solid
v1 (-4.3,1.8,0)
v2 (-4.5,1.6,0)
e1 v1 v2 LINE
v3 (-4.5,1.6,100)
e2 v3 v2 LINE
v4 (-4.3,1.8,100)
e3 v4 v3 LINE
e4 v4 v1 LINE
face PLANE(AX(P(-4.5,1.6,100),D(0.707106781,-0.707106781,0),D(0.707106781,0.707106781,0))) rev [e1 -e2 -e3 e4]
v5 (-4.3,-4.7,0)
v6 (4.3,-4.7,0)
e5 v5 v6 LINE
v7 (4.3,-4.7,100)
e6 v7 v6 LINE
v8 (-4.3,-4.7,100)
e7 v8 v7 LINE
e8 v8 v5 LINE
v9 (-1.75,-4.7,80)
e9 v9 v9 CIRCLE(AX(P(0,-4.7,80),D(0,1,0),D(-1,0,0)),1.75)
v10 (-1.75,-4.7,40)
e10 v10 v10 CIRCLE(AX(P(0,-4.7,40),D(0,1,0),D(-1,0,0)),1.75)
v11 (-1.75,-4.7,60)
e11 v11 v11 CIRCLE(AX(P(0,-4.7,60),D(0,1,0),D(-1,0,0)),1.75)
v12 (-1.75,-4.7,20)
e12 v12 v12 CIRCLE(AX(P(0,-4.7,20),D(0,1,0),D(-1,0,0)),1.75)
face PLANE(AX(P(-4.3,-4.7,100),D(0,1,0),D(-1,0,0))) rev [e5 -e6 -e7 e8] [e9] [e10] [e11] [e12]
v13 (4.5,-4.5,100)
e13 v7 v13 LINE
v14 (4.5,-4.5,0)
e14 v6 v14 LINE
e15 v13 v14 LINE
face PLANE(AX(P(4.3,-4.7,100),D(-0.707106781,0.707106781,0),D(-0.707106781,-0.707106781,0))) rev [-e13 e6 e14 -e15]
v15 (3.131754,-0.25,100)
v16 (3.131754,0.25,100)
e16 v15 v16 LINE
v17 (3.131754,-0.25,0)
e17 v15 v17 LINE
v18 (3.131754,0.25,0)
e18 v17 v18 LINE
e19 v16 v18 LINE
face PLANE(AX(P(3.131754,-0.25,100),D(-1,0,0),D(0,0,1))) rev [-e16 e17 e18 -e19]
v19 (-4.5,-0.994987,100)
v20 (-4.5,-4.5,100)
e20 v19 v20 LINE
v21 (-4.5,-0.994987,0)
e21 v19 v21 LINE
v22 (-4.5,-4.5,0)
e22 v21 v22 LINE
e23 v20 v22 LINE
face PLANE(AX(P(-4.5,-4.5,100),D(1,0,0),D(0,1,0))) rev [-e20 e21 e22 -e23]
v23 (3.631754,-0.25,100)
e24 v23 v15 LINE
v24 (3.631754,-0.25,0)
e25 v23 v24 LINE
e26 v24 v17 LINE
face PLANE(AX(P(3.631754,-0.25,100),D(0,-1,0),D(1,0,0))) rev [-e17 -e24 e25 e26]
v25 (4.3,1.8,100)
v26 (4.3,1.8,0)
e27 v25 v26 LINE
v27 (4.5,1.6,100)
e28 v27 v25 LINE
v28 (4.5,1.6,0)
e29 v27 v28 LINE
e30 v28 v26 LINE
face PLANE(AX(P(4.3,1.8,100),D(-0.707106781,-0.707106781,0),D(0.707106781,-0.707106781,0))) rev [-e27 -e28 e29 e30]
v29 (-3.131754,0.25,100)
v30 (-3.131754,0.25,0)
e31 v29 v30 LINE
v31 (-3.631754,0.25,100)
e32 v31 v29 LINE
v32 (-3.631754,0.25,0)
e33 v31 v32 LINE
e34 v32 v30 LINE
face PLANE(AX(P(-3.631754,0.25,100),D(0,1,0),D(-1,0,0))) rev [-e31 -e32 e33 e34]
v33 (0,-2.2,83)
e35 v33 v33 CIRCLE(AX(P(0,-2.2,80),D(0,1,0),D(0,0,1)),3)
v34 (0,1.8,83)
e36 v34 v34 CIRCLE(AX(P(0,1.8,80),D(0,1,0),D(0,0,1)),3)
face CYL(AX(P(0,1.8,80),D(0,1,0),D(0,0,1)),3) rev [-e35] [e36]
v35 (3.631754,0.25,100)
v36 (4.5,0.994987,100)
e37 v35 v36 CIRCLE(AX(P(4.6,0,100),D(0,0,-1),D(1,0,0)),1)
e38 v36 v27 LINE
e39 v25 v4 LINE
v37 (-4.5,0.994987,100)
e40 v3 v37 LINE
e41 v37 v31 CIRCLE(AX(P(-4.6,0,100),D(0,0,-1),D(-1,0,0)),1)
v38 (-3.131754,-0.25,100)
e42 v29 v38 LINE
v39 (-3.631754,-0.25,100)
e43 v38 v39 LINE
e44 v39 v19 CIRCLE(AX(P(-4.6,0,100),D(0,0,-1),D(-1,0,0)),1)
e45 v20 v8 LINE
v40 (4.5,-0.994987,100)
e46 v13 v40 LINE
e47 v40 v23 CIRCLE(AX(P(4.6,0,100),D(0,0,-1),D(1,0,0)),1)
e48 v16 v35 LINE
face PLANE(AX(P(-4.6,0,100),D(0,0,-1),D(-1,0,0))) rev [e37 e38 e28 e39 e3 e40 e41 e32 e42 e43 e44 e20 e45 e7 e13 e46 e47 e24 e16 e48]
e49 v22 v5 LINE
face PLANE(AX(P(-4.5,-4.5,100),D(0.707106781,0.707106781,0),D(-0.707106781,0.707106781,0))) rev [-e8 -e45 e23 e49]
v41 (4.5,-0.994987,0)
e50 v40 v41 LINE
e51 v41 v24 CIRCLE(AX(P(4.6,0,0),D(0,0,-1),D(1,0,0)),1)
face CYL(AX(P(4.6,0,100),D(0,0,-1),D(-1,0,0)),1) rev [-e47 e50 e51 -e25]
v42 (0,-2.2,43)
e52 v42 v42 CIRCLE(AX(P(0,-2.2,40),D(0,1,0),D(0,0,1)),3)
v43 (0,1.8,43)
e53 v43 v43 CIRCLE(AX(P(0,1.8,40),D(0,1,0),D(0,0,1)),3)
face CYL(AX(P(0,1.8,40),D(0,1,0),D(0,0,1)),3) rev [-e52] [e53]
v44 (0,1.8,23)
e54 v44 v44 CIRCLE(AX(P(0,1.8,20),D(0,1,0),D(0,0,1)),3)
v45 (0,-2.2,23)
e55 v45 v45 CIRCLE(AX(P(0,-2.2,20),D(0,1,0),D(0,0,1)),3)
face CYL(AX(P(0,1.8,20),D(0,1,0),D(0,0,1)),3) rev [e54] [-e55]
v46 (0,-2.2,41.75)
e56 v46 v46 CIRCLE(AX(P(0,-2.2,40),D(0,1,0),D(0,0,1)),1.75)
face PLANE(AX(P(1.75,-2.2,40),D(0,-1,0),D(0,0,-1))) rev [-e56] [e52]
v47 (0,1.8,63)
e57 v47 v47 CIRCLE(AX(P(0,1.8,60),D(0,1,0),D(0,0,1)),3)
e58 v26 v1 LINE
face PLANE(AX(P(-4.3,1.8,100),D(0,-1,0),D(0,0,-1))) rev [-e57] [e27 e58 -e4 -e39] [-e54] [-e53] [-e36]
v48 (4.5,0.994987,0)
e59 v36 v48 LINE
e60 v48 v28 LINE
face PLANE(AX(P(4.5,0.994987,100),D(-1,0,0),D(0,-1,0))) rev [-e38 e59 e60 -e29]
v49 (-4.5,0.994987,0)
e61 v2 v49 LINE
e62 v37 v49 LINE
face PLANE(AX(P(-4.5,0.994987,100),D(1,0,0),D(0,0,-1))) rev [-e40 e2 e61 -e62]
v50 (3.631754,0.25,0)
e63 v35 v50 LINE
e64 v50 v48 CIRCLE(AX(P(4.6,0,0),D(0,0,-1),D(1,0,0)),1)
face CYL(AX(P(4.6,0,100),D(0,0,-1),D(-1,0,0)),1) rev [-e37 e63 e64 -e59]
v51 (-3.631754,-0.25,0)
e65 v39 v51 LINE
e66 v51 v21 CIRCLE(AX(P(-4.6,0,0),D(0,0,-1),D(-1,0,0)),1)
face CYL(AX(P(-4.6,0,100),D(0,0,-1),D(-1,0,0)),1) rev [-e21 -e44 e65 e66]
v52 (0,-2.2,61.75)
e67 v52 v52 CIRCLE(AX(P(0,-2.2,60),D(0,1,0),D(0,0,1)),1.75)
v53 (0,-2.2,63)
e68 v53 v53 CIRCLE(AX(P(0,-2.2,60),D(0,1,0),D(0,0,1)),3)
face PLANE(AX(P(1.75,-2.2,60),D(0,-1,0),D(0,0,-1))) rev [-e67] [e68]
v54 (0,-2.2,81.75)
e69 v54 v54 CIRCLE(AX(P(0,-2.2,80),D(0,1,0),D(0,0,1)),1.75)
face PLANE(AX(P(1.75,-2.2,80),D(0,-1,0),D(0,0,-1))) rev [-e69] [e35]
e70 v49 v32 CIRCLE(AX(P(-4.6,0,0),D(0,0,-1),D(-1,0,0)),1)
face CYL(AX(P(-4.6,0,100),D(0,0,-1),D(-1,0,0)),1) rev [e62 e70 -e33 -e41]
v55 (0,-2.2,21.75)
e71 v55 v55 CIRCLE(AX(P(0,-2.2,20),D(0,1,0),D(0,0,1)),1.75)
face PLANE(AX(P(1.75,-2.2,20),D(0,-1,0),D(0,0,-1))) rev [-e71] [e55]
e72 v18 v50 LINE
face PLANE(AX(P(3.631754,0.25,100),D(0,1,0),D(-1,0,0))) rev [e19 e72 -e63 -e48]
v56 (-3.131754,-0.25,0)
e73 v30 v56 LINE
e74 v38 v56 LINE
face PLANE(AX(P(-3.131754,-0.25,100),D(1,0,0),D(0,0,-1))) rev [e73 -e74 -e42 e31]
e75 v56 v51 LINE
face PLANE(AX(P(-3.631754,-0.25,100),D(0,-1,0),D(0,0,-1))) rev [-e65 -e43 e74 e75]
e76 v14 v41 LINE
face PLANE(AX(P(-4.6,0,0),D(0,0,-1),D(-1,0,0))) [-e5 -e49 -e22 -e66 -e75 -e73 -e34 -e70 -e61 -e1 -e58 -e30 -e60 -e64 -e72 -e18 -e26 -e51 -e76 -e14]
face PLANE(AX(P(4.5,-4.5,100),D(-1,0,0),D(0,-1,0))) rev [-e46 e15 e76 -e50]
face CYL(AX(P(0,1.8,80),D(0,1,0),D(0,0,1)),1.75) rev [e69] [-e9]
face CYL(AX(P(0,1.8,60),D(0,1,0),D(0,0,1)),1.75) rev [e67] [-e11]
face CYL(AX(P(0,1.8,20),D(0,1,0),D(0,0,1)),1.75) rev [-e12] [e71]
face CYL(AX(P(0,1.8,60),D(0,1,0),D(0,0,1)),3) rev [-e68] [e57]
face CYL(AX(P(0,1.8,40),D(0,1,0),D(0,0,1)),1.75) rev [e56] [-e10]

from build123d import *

# Parameters (mm, degrees)
EXTRUDE_RAIL_PROFILE_DEPTH     = 100
CBORE_FOR_M3_SHCS2_D           = 3.5
CBORE_FOR_M3_SHCS2_CBORE_D     = 6
CBORE_FOR_M3_SHCS2_CBORE_DEPTH = 4
FILL_START                     = -2.2
FILL_PATTERN_OUTLINE_R         = 3
FILL_PATTERN_DEPTH             = 4
FILL_START_2                   = -4.7
FILL_PATTERN_2_OUTLINE_R       = 1.75
FILL_PATTERN_2_DEPTH           = 2.5


# Read off the part's stored shape, not the designer's step: Fill Pattern
with BuildPart() as part:
    # Rail Profile Sketch → Extrude Rail Profile (new body)
    with BuildSketch(Plane.XY):
        with BuildLine():
            Line((-4.3, -4.7), (4.3, -4.7))
            Line((4.3, -4.7), (4.5, -4.5))
            Line((4.5, -4.5), (4.5, -0.994987437))
            ThreePointArc((4.5, -0.994987437), (3.948817336, -0.758921035), (3.631754163, -0.25))
            Line((3.631754163, -0.25), (3.131754163, -0.25))
            Line((3.131754163, -0.25), (3.131754163, 0.25))
            Line((3.131754163, 0.25), (3.631754163, 0.25))
            ThreePointArc((3.631754163, 0.25), (3.948817336, 0.758921035), (4.5, 0.994987437))
            Line((4.5, 0.994987437), (4.5, 1.6))
            Line((4.5, 1.6), (4.3, 1.8))
            Line((4.3, 1.8), (-4.3, 1.8))
            Line((-4.3, 1.8), (-4.5, 1.6))
            Line((-4.5, 1.6), (-4.5, 0.994987437))
            ThreePointArc((-4.5, 0.994987437), (-3.948817336, 0.758921035), (-3.631754163, 0.25))
            Line((-3.631754163, 0.25), (-3.131754163, 0.25))
            Line((-3.131754163, 0.25), (-3.131754163, -0.25))
            Line((-3.131754163, -0.25), (-3.631754163, -0.25))
            ThreePointArc((-3.631754163, -0.25), (-3.948817336, -0.758921035), (-4.5, -0.994987437))
            Line((-4.5, -0.994987437), (-4.5, -4.5))
            Line((-4.5, -4.5), (-4.3, -4.7))
        make_face()
    extrude(amount=EXTRUDE_RAIL_PROFILE_DEPTH)

    # CBORE for M3 SHCS2 (through all)
    with Locations(Plane(origin=(0, 1.8, 0), x_dir=(1, 0, 0), z_dir=(0, 1, 0))):
        with Locations((0, -40)):
            CounterBoreHole(CBORE_FOR_M3_SHCS2_D / 2, CBORE_FOR_M3_SHCS2_CBORE_D / 2, CBORE_FOR_M3_SHCS2_CBORE_DEPTH)

    # Fill Pattern outline → Fill Pattern (cut)
    with BuildSketch(Plane(origin=(0, 0, 0), x_dir=(1, 0, 0), z_dir=(0, 1, 0)).offset(FILL_START)):
        with Locations((0, -20)):
            Circle(FILL_PATTERN_OUTLINE_R)
        with Locations((0, -60)):
            Circle(FILL_PATTERN_OUTLINE_R)
        with Locations((0, -80)):
            Circle(FILL_PATTERN_OUTLINE_R)
    extrude(amount=FILL_PATTERN_DEPTH, mode=Mode.SUBTRACT)

    # Fill Pattern 2 outline → Fill Pattern 2 (cut)
    with BuildSketch(Plane(origin=(0, 0, 0), x_dir=(1, 0, 0), z_dir=(0, 1, 0)).offset(FILL_START_2)):
        with Locations((0, -20)):
            Circle(FILL_PATTERN_2_OUTLINE_R)
        with Locations((0, -60)):
            Circle(FILL_PATTERN_2_OUTLINE_R)
        with Locations((0, -80)):
            Circle(FILL_PATTERN_2_OUTLINE_R)
    extrude(amount=FILL_PATTERN_2_DEPTH, mode=Mode.SUBTRACT)


solid = part.part
